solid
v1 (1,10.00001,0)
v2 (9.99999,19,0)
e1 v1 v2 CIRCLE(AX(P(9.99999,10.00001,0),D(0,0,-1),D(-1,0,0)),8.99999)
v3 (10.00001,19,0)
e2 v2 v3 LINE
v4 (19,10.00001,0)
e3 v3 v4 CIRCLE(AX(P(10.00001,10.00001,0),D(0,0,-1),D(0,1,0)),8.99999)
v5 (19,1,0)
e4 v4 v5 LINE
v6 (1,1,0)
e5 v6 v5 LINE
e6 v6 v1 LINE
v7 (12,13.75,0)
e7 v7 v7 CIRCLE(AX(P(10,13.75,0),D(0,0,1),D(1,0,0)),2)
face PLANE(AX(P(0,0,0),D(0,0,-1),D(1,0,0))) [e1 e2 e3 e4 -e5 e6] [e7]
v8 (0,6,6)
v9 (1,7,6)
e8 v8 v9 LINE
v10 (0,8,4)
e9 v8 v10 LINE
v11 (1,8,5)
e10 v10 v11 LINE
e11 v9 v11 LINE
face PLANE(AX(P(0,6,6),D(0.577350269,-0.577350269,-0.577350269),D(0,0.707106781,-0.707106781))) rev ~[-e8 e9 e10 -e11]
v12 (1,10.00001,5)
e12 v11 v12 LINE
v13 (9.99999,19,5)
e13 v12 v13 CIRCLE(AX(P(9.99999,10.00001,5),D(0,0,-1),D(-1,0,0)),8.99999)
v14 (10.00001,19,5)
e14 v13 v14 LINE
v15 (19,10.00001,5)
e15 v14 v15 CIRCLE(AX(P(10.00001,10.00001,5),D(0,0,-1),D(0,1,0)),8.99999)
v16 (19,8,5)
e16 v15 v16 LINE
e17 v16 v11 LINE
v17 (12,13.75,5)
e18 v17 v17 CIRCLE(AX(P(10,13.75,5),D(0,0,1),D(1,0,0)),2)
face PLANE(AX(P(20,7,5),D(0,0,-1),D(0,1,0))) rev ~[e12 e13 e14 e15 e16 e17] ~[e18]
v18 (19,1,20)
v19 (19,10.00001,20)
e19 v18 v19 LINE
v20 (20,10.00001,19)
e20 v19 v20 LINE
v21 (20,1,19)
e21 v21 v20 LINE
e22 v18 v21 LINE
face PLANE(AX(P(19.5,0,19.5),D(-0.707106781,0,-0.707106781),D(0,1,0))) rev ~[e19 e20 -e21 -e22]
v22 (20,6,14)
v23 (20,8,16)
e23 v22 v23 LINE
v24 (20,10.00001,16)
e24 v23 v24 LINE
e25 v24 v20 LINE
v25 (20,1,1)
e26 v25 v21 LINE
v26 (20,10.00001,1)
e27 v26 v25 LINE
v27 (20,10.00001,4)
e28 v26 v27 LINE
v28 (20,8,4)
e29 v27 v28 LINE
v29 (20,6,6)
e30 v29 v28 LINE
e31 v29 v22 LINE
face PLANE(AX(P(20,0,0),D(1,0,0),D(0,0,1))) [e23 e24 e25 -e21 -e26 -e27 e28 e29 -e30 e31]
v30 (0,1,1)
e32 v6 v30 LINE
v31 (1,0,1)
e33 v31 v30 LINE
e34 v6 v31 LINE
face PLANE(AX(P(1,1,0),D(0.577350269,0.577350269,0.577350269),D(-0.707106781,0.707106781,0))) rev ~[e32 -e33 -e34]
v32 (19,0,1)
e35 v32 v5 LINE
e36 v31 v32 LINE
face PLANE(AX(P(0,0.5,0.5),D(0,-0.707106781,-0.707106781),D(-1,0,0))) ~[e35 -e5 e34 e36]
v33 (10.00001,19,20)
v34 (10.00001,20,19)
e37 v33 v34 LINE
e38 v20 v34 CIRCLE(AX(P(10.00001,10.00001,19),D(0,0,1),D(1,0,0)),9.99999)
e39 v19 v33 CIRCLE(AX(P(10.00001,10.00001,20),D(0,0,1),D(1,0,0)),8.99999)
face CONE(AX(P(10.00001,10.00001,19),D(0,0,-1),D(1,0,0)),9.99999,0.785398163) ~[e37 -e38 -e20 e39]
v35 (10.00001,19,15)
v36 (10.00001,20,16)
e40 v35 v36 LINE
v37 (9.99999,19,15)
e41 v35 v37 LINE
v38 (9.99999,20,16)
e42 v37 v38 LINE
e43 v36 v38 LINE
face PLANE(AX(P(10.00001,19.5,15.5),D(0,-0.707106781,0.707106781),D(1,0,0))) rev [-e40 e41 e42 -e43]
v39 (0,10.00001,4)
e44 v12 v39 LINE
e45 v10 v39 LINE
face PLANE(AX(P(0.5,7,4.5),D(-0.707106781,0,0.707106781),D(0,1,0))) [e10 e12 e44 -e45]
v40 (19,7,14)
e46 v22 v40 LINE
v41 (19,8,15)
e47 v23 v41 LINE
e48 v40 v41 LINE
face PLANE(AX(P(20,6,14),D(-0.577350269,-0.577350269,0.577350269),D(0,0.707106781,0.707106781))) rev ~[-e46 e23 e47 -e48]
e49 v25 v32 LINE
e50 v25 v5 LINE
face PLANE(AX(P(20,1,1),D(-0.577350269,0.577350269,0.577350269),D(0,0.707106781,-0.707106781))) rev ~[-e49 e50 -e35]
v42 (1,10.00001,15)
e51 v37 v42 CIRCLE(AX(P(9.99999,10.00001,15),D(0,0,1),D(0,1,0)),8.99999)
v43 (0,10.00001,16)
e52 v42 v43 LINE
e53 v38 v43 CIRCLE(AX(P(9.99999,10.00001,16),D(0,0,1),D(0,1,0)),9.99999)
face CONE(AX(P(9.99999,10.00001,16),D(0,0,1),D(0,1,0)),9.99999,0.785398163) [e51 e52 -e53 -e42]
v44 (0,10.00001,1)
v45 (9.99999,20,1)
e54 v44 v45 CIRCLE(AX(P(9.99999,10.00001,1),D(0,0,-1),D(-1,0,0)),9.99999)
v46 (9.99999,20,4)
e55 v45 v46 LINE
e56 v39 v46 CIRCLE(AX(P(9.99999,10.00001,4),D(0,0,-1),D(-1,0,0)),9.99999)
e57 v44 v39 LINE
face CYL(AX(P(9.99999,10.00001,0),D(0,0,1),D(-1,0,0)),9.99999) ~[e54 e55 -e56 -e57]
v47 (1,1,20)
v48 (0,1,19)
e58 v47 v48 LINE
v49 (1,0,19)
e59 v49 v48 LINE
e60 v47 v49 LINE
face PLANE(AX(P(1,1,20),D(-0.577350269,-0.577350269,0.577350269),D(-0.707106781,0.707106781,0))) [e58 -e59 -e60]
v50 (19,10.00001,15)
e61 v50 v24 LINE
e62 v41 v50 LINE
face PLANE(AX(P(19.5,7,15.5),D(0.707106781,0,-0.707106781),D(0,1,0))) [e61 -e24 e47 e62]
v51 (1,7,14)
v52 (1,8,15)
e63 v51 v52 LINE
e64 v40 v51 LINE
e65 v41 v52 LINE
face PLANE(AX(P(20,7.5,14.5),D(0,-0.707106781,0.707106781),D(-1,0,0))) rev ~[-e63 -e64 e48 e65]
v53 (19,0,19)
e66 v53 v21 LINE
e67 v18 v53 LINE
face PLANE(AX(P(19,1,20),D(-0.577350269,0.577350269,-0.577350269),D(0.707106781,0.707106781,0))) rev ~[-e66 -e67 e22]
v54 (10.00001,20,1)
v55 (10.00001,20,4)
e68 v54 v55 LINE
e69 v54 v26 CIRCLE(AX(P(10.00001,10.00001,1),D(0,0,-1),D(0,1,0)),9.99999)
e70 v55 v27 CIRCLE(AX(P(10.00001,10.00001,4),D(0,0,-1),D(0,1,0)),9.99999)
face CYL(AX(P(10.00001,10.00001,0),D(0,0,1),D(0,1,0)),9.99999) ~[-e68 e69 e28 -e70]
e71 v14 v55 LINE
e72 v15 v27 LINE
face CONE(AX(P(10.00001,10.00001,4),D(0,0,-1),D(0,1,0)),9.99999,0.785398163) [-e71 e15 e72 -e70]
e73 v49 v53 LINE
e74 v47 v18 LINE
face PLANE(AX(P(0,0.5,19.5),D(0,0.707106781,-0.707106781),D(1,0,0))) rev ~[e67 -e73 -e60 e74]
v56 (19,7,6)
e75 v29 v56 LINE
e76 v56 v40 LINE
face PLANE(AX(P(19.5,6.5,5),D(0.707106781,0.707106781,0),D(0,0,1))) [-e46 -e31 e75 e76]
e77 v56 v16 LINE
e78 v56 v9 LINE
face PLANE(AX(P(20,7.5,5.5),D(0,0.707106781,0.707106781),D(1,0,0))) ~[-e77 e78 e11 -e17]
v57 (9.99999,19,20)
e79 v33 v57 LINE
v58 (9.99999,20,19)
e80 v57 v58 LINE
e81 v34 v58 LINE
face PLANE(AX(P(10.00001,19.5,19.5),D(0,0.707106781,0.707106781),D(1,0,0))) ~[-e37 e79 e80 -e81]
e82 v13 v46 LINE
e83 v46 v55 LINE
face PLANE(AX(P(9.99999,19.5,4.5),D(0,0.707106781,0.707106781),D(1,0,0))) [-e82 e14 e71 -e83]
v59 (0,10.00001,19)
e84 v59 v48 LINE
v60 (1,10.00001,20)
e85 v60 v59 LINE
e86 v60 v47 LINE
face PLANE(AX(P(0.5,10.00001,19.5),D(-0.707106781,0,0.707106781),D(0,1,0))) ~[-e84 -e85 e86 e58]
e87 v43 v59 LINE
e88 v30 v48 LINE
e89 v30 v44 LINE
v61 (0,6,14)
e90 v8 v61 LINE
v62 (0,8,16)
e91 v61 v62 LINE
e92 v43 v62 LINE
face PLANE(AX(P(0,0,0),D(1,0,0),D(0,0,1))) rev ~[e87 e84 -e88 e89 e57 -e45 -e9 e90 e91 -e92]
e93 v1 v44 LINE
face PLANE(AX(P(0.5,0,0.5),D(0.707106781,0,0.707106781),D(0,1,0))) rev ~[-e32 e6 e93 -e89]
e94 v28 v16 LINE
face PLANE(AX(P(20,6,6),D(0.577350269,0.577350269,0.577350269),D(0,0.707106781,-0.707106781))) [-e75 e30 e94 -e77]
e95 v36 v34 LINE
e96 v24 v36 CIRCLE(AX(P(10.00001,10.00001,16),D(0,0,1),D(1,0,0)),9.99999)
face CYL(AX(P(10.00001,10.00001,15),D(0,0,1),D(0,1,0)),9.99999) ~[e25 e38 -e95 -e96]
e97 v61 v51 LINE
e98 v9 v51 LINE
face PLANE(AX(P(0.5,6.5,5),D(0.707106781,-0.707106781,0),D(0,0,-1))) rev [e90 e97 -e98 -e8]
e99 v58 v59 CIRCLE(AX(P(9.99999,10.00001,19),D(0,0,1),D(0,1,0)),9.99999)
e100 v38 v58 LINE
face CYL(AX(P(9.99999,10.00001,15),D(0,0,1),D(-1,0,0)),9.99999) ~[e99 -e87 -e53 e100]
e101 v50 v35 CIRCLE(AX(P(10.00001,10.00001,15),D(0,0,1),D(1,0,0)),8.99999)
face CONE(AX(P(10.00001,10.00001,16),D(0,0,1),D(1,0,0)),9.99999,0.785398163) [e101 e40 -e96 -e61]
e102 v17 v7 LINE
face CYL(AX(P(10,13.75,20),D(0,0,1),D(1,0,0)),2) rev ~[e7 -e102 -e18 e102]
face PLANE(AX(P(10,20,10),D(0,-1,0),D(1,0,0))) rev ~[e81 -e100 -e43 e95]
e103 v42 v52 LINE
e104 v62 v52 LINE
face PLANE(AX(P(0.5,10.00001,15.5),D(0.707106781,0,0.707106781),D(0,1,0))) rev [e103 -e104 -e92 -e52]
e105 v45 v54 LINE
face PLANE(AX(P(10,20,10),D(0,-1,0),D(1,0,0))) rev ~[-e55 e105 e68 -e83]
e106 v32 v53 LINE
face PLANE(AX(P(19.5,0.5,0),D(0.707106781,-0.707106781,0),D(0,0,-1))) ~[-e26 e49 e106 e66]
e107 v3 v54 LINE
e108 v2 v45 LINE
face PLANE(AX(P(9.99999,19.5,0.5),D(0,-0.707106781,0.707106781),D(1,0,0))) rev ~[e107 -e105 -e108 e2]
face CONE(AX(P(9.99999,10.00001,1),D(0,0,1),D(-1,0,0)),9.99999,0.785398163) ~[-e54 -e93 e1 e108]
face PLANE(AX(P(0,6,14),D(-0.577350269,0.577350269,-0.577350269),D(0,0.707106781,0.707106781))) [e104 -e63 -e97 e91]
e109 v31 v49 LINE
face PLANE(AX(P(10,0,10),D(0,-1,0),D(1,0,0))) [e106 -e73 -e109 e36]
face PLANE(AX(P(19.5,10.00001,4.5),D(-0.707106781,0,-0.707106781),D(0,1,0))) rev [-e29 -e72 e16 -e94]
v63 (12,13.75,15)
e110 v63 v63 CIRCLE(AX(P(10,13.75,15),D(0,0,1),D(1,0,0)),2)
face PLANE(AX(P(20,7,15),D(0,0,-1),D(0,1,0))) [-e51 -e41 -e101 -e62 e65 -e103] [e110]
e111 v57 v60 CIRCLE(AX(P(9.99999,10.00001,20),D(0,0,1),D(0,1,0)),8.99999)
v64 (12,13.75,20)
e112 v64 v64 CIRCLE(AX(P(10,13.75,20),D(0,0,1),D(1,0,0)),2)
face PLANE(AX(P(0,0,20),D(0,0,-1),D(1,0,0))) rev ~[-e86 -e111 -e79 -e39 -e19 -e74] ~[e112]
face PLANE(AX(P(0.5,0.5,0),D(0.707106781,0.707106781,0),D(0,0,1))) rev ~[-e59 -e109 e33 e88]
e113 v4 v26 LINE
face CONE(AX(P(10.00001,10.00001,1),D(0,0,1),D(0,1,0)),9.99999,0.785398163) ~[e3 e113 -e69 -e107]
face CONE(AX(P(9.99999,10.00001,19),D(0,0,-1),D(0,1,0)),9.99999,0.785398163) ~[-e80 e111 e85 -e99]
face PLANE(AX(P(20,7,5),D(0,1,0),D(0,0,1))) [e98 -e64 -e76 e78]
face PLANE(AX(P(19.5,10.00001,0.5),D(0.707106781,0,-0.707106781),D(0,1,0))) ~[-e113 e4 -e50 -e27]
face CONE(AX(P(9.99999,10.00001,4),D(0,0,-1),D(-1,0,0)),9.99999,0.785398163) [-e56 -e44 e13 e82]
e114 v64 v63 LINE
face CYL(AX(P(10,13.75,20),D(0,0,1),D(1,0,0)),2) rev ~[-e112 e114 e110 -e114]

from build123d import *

# Parameters (mm, degrees)
F0_W     = 20
F0_H     = 20
F1_DEPTH = 20
F2_W     = 13
F2_H     = 10
F3_DEPTH = 20
F4_R     = 2
F5_DEPTH = 20
F6_R     = 9.99999
F7_SIZE  = 1


# Not quite as in the source:
# - a fillet or chamfer is up to 0.001 mm smaller than in the source, because OpenCascade refuses the exact size


with BuildPart() as f1:
    # F0 (on Front) → F1 (new body)
    with BuildSketch(Plane.XZ):
        with Locations((10, 10)):
            Rectangle(F0_W, F0_H)
    extrude(amount=-F1_DEPTH)

    # F2 (on face) → F3 (cut, through all)
    with BuildSketch(Plane.YZ.offset(20)):
        with Locations((13.5, 10)):
            Rectangle(F2_W, F2_H)
    extrude(amount=-F3_DEPTH, mode=Mode.SUBTRACT)

    # F4 (on face) → F5 (cut, through all)
    with BuildSketch(Plane.XY.offset(20)):
        with Locations((10, 13.75)):
            Circle(F4_R)
    extrude(amount=-F5_DEPTH, mode=Mode.SUBTRACT)

    # F6 (radius 10 in the source; OpenCascade refuses exactly that, so slightly less here)
    f6_edges = [f1.edges().sort_by_distance(p)[0] for p in [
        (0, 20, 2.5),
        (20, 20, 2.5),
        (20, 20, 17.5),
        (0, 20, 17.5),
    ]]
    fillet(f6_edges, radius=F6_R)

    # F7
    f7_edges = [f1.edges().sort_by_distance(p)[0] for p in [
        (0, 0, 10),
        (10, 0, 0),
        (20, 0, 10),
        (10, 0, 20),
        (10, 7, 15),
        (10, 7, 5),
        (20, 7, 10),
        (0, 7, 10),
        (17.071071, 17.071071, 0),
        (10.00001, 20, 2.5),
        (20, 10.00001, 2.5),
        (17.071071, 17.071071, 5),
        (20, 5.000005, 20),
        (20, 10.00001, 17.5),
        (20, 8.500005, 15),
        (20, 5.000005, 0),
        (20, 8.500005, 5),
        (17.071071, 17.071071, 15),
        (10.00001, 20, 17.5),
        (17.071071, 17.071071, 20),
    ]]
    chamfer(f7_edges, length=F7_SIZE)


solid = f1.part
